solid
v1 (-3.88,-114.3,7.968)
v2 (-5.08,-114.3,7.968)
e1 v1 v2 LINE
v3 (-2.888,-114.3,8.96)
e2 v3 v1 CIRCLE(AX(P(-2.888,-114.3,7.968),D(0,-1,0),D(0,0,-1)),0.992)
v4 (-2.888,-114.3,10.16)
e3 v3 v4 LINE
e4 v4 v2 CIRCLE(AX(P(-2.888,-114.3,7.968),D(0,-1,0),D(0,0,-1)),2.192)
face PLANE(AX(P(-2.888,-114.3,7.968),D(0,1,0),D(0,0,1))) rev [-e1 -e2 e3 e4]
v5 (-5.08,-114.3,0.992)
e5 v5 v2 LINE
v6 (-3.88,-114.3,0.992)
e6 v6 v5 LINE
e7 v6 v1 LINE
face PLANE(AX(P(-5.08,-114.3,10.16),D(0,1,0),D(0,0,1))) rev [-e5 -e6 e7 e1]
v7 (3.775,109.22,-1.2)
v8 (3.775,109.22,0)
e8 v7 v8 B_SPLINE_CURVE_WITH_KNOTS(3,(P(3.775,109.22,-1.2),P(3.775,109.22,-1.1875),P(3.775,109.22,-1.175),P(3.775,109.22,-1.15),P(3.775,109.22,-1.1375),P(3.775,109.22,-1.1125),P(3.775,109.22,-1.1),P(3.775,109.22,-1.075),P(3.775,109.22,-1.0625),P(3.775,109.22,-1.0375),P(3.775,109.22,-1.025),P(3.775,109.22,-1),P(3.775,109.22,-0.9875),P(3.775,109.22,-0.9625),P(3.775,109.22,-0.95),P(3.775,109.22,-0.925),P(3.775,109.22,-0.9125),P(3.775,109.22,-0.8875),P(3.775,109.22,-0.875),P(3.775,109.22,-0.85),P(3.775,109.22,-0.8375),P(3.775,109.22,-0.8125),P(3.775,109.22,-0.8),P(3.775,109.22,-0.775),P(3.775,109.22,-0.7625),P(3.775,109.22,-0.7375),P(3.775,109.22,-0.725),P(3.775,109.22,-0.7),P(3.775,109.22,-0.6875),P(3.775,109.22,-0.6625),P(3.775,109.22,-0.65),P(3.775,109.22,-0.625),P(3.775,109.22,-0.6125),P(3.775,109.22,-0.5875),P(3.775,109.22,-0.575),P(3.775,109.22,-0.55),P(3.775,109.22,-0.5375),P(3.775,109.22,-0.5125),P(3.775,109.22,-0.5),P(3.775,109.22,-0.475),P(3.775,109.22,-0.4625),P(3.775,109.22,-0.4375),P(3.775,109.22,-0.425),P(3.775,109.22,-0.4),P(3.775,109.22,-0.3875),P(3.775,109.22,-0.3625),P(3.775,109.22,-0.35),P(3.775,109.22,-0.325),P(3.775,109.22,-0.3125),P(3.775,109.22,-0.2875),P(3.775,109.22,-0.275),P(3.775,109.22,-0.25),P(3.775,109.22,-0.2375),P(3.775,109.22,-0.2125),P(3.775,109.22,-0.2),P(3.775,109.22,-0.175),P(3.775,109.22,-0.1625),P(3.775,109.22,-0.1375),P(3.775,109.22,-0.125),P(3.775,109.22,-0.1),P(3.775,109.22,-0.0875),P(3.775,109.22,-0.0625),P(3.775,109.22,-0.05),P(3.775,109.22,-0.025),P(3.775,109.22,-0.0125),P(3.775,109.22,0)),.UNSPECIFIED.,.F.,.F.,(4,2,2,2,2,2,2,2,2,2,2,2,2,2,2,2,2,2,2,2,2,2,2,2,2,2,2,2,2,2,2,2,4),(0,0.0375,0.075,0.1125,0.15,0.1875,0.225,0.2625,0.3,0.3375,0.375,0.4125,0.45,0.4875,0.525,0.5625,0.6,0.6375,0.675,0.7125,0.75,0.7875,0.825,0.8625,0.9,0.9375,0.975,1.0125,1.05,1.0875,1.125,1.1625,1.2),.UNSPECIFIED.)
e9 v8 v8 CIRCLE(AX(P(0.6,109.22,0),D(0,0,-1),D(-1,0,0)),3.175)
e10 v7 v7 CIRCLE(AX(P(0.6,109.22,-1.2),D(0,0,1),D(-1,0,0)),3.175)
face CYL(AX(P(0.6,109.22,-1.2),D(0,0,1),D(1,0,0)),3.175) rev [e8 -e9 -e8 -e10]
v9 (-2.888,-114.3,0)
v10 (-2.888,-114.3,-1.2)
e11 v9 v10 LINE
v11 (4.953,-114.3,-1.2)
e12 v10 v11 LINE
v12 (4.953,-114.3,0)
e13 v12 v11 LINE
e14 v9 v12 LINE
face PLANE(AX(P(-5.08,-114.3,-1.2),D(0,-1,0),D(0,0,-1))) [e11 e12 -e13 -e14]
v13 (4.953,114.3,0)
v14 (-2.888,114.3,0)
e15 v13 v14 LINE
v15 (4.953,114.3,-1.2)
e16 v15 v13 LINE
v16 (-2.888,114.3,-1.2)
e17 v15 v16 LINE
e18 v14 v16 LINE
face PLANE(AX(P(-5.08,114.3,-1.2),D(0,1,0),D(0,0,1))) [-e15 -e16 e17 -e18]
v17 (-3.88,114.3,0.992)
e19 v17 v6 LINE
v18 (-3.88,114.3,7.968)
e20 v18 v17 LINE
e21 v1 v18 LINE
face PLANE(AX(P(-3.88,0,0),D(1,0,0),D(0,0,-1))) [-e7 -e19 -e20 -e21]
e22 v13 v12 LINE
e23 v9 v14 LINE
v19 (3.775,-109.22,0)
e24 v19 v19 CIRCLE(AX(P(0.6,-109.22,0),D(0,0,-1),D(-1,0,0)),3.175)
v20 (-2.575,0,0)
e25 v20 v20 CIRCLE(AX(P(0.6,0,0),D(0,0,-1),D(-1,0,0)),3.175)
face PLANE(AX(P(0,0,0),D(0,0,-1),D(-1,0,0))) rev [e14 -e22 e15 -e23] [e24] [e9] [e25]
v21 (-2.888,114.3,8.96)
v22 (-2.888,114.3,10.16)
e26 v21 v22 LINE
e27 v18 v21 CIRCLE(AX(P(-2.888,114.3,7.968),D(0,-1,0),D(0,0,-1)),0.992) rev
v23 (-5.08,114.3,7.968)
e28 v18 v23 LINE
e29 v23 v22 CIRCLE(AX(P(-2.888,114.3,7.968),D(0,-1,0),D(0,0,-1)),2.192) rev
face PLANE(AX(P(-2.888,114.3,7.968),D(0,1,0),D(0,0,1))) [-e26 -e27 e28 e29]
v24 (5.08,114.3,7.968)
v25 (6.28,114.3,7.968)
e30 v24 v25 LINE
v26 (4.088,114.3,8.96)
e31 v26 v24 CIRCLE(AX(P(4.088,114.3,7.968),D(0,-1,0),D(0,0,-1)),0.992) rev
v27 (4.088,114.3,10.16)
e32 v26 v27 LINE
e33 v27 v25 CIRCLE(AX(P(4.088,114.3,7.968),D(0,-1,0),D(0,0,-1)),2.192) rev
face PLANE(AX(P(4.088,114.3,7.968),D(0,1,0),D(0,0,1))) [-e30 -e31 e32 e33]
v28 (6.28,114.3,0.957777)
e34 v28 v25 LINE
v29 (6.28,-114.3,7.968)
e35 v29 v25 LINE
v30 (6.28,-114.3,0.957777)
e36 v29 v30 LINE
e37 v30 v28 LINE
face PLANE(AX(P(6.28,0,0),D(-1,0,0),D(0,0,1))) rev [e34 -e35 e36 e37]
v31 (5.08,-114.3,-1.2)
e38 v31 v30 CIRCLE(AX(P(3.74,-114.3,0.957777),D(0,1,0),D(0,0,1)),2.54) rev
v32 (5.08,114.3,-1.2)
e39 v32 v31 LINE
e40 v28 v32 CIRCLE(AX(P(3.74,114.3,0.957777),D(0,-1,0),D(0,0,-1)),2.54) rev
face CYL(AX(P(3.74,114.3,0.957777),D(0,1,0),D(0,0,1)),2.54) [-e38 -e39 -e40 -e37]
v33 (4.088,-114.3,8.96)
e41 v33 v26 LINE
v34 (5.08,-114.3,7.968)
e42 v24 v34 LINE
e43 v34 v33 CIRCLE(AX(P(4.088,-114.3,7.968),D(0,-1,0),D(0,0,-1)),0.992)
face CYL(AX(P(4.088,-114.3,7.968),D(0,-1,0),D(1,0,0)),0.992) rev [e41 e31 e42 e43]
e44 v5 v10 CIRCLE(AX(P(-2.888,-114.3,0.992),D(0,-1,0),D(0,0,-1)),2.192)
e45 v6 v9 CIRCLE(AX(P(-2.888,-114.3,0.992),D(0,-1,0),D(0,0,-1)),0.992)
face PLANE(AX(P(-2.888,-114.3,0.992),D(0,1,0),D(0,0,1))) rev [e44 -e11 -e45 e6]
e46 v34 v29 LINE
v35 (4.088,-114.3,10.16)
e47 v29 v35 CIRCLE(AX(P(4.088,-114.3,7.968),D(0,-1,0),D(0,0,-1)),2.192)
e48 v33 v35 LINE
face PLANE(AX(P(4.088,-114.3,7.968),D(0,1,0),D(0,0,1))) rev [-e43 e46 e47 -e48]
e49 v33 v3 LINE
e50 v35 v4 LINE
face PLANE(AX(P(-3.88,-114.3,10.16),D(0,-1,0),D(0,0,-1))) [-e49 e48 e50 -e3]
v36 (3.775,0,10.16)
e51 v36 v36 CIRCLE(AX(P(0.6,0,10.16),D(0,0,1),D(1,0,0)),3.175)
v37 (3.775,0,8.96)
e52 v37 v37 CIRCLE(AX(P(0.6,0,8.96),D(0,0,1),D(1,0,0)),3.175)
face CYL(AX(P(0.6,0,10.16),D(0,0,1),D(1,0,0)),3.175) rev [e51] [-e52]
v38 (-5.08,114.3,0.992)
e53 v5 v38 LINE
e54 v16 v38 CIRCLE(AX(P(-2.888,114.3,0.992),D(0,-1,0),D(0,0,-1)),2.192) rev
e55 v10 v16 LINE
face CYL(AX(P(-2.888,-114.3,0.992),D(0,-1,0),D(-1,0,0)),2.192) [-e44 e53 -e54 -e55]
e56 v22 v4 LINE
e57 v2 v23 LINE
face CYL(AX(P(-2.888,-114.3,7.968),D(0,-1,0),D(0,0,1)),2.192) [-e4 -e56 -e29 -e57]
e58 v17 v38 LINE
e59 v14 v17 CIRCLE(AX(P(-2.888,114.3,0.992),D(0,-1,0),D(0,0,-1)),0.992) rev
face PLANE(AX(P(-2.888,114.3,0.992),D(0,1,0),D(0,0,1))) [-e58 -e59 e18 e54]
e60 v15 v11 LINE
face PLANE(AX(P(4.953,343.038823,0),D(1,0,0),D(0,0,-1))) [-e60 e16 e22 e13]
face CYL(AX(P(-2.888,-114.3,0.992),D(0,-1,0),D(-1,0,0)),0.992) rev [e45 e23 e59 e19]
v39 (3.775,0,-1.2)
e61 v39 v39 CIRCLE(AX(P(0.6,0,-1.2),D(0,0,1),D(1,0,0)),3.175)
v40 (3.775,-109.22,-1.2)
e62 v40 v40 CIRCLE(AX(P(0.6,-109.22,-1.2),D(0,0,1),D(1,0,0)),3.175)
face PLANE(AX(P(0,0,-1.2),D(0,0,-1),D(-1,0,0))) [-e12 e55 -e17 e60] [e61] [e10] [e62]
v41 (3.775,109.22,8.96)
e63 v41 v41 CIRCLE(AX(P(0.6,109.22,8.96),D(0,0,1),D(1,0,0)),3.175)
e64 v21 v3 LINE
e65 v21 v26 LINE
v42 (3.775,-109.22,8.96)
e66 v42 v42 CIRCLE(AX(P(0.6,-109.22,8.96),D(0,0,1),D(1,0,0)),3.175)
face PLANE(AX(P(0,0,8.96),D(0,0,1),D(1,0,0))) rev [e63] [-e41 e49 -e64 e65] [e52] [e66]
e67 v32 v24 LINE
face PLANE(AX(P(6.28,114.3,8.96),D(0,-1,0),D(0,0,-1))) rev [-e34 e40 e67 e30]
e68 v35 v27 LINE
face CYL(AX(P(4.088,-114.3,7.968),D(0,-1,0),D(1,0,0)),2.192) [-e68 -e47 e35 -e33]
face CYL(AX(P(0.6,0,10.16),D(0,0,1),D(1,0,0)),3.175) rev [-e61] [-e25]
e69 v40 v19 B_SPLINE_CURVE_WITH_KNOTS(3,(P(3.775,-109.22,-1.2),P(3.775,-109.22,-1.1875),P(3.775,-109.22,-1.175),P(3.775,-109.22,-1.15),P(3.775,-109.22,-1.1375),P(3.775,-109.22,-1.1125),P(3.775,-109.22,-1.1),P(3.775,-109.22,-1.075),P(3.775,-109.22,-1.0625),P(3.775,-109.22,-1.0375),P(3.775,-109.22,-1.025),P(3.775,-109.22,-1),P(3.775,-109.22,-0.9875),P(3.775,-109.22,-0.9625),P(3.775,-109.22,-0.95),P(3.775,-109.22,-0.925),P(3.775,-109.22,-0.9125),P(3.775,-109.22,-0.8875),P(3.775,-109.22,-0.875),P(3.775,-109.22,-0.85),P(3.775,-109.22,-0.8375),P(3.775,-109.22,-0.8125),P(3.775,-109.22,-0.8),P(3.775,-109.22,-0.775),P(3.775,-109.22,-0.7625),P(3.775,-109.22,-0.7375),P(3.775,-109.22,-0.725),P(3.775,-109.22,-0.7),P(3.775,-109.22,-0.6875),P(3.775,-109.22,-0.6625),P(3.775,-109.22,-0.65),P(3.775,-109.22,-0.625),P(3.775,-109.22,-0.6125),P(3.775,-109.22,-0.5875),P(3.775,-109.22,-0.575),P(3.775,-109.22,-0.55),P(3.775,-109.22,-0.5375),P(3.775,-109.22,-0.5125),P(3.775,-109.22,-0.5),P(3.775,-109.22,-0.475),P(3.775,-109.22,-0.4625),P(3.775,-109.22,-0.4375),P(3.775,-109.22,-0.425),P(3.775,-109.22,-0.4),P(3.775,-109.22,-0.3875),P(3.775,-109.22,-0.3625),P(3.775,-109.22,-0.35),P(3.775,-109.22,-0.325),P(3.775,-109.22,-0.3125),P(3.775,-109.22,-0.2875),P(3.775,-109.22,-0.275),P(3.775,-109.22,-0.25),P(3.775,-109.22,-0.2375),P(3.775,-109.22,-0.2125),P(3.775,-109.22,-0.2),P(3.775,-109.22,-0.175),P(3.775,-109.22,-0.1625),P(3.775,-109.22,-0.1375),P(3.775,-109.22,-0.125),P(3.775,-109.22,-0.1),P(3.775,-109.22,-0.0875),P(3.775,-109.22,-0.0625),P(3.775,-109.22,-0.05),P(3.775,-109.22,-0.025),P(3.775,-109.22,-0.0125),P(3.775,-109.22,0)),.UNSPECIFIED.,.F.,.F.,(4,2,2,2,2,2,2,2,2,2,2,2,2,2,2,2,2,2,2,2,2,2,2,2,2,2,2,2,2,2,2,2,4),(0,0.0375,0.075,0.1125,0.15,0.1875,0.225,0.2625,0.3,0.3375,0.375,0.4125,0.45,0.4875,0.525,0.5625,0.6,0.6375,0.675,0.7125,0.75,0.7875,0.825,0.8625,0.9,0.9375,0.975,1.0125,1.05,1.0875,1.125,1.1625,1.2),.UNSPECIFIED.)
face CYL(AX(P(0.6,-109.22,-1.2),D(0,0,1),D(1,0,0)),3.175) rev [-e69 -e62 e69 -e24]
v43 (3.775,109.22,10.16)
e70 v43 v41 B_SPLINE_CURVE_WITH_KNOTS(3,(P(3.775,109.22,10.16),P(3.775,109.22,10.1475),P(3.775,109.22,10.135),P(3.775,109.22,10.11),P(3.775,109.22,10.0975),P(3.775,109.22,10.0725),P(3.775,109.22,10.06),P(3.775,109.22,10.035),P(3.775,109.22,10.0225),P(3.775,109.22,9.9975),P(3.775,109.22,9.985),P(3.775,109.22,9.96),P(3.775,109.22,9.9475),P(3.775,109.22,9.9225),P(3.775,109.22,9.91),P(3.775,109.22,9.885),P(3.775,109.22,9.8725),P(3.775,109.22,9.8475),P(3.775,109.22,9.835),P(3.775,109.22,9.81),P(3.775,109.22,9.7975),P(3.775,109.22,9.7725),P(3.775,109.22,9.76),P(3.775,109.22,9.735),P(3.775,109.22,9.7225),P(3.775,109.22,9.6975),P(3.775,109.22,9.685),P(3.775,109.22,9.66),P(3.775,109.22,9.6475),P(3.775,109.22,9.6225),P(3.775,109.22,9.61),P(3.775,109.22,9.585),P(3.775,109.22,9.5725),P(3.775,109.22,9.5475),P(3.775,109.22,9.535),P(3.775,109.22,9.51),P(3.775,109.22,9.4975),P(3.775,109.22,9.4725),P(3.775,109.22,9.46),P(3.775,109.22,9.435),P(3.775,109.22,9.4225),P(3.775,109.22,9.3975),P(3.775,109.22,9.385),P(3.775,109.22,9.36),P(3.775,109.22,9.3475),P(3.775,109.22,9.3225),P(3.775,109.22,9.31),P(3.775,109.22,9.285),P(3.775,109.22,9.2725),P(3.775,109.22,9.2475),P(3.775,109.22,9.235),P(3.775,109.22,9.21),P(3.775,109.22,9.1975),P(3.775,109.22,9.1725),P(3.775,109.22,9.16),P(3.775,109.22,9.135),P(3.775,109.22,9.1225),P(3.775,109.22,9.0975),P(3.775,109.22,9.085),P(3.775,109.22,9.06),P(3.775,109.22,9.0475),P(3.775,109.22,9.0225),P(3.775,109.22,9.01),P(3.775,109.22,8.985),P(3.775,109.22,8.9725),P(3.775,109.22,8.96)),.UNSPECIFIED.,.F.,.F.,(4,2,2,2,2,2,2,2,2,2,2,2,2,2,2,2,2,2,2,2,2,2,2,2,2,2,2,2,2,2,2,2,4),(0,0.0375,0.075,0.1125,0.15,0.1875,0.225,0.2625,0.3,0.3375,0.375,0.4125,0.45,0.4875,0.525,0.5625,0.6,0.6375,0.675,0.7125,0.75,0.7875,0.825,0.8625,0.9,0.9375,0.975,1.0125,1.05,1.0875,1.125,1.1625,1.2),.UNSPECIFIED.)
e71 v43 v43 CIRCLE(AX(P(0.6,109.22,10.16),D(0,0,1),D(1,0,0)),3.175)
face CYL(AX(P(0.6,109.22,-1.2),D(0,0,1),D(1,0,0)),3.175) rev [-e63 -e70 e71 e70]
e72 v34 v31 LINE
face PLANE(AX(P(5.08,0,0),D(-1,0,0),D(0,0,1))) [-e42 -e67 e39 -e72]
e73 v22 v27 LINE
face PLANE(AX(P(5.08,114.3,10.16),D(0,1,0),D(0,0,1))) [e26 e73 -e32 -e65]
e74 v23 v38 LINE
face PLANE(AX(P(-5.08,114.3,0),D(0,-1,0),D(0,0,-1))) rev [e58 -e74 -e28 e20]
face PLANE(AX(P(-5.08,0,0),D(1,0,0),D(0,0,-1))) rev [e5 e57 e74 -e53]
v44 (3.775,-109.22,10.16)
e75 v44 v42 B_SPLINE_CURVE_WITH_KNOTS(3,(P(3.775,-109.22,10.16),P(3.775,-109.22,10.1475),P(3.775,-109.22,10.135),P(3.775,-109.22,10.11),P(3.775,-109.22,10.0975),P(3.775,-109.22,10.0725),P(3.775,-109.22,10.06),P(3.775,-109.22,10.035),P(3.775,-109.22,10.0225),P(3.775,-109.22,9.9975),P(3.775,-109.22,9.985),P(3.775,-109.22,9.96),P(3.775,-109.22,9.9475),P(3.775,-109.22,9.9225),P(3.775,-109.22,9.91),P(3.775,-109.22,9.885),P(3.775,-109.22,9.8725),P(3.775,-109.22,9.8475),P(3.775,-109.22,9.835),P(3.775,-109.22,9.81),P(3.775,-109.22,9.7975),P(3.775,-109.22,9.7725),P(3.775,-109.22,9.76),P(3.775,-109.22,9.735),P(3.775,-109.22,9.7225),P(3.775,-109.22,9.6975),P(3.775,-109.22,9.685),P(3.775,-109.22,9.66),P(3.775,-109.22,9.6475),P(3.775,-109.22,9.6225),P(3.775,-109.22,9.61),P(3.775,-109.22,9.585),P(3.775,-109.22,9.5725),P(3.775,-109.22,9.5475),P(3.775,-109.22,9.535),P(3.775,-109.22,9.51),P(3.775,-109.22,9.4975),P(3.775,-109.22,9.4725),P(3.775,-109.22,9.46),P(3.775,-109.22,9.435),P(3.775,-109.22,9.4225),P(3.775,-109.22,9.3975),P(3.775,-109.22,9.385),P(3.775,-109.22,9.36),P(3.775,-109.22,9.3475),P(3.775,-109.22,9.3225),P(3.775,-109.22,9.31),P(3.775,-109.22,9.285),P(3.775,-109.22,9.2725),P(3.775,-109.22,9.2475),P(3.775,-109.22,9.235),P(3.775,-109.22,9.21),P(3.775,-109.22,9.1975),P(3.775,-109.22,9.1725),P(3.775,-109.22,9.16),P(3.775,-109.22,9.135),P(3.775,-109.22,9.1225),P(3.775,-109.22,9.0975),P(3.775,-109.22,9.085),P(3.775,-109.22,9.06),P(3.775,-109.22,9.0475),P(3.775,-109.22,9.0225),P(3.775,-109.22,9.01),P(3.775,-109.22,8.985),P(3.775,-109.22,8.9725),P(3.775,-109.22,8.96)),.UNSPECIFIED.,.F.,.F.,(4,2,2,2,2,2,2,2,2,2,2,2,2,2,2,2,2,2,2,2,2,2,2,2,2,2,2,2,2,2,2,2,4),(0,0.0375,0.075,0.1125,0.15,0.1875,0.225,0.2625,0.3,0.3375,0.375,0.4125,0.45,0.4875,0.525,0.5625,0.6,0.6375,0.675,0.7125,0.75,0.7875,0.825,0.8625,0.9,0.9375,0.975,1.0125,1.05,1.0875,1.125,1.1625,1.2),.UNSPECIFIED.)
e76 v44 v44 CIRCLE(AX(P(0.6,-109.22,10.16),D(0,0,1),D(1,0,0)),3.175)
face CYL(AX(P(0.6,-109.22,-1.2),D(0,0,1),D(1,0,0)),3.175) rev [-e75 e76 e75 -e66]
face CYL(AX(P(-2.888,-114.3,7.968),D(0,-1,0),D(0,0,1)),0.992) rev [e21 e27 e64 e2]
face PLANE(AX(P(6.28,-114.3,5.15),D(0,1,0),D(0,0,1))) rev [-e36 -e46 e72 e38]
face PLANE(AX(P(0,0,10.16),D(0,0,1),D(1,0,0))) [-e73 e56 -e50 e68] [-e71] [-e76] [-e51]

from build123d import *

# Parameters (mm, degrees)
SKETCH12_W                   = 10.16
SKETCH12_H                   = 228.6
BASE_FLANGE1_DEPTH           = 1.2
EDGE_FLANGE1_STRIP_W         = 6.784000096
EDGE_FLANGE1_STRIP_H         = 1.2
EDGE_FLANGE1_STRIP_CUT_DEPTH = 228.6
EDGE_FLANGE1_DEPTH           = 228.6
EDGE_FLANGE2_STRIP_W         = 6.784000096
EDGE_FLANGE2_STRIP_H         = 1.2
EDGE_FLANGE2_STRIP_CUT_DEPTH = 228.6
EDGE_FLANGE2_DEPTH           = 228.6
EDGE_FLANGE3_STRIP_W         = 6.784000096
EDGE_FLANGE3_STRIP_H         = 1.2
EDGE_FLANGE3_STRIP_CUT_DEPTH = 228.6
EDGE_FLANGE3_DEPTH           = 228.6
F_1_4_0_25_DIAMETER_HOLE1_D  = 6.35
CUT_EXTRUDE1_DEPTH           = 116.034681727
CUT_EXTRUDE1_DEPTH_BACK      = 116.034681727
SKETCH30_R                   = 3.175
CLOSED_START                 = -114.3
CLOSED_CORNER1_OUTLINE_W     = 0.127
CLOSED_CORNER1_OUTLINE_H     = 1.2
CLOSED_CORNER1_DEPTH         = 228.6
CLOSED_CORNER1_2_OUTLINE_W   = 1.2
CLOSED_CORNER1_2_OUTLINE_H   = 6.35
CLOSED_CORNER1_2_DEPTH       = 228.6
FILLET1_R                    = 2.54


# Read off the part's stored shape, not the designer's step: Closed Corner1
# Sheet-metal steps are written as plain solids
with BuildPart() as part:
    # Sketch12 → Base-Flange1 (new body)
    with BuildSketch(Plane.XY):
        Rectangle(SKETCH12_W, SKETCH12_H)
    extrude(amount=-BASE_FLANGE1_DEPTH)

    # Edge-Flange1 strip (across the edge) → Edge-Flange1 strip cut (cut)
    with BuildSketch(Plane(origin=(-5.08, 114.3, 0), x_dir=(1, 0, 0), z_dir=(0, -1, 0))):
        with Locations((-1.2, -0.6)):
            Rectangle(EDGE_FLANGE1_STRIP_W, EDGE_FLANGE1_STRIP_H)
    extrude(amount=EDGE_FLANGE1_STRIP_CUT_DEPTH, mode=Mode.SUBTRACT)

    # Edge-Flange1 section (across the edge) → Edge-Flange1 (add)
    with BuildSketch(Plane(origin=(-5.08, 114.3, 0), x_dir=(1, 0, 0), z_dir=(0, -1, 0))):
        with BuildLine():
            Line((0, 0.992000048), (0, 10.16))
            Line((0, 10.16), (1.2, 10.16))
            Line((1.2, 10.16), (1.2, 0.992000048))
            ThreePointArc((1.2, 0.992000048), (1.490550087, 0.290550087), (2.192000048, 0))
            Line((2.192000048, 0), (2.192000048, -1.2))
            ThreePointArc((2.192000048, -1.2), (0.64202195, -0.55797805), (0, 0.992000048))
        make_face()
    extrude(amount=EDGE_FLANGE1_DEPTH)

    # Edge-Flange2 strip (across the edge) → Edge-Flange2 strip cut (cut)
    with BuildSketch(Plane(origin=(-3.88, 114.3, 10.16), x_dir=(0, 0, -1), z_dir=(0, -1, 0))):
        with Locations((-1.2, -0.6)):
            Rectangle(EDGE_FLANGE2_STRIP_W, EDGE_FLANGE2_STRIP_H)
    extrude(amount=EDGE_FLANGE2_STRIP_CUT_DEPTH, mode=Mode.SUBTRACT)

    # Edge-Flange2 section (across the edge) → Edge-Flange2 (add)
    with BuildSketch(Plane(origin=(-3.88, 114.3, 10.16), x_dir=(0, 0, -1), z_dir=(0, -1, 0))):
        with BuildLine():
            Line((0, 0.992000048), (0, 8.96))
            Line((0, 8.96), (1.2, 8.96))
            Line((1.2, 8.96), (1.2, 0.992000048))
            ThreePointArc((1.2, 0.992000048), (1.490550087, 0.290550087), (2.192000048, 0))
            Line((2.192000048, 0), (2.192000048, -1.2))
            ThreePointArc((2.192000048, -1.2), (0.64202195, -0.55797805), (0, 0.992000048))
        make_face()
    extrude(amount=EDGE_FLANGE2_DEPTH)

    # Edge-Flange3 strip (across the edge) → Edge-Flange3 strip cut (cut)
    with BuildSketch(Plane(origin=(5.08, 114.3, 8.96), x_dir=(-1, 0, 0), z_dir=(0, -1, 0))):
        with Locations((-2.4, -0.6)):
            Rectangle(EDGE_FLANGE3_STRIP_W, EDGE_FLANGE3_STRIP_H)
    extrude(amount=EDGE_FLANGE3_STRIP_CUT_DEPTH, mode=Mode.SUBTRACT)

    # Edge-Flange3 section (across the edge) → Edge-Flange3 (add)
    with BuildSketch(Plane(origin=(5.08, 114.3, 8.96), x_dir=(-1, 0, 0), z_dir=(0, -1, 0))):
        with BuildLine():
            Line((-1.2, 0.992000048), (-1.2, 3.81))
            Line((-1.2, 3.81), (0, 3.81))
            Line((0, 3.81), (0, 0.992000048))
            ThreePointArc((0, 0.992000048), (0.290550087, 0.290550087), (0.992000048, 0))
            Line((0.992000048, 0), (0.992000048, -1.2))
            ThreePointArc((0.992000048, -1.2), (-0.55797805, -0.55797805), (-1.2, 0.992000048))
        make_face()
    extrude(amount=EDGE_FLANGE3_DEPTH)

    # 1/4 (0.25) Diameter Hole1 (through all)
    with Locations(Plane.XY.offset(10.16)):
        with Locations((0.6, 0)):
            Hole(F_1_4_0_25_DIAMETER_HOLE1_D / 2)

    # Sketch30 → Cut-Extrude1 (cut, two sides: drawn at the far end of the back side and taken through both)
    with BuildSketch(Plane.XY.offset(10.16).offset(-CUT_EXTRUDE1_DEPTH_BACK)):
        with Locations((0.6, -109.22)):
            Circle(SKETCH30_R)
        with Locations((0.6, 109.22)):
            Circle(SKETCH30_R)
    extrude(amount=CUT_EXTRUDE1_DEPTH + CUT_EXTRUDE1_DEPTH_BACK, mode=Mode.SUBTRACT)

    # Closed Corner1 outline → Closed Corner1 (cut)
    with BuildSketch(Plane(origin=(0, 0, 0), x_dir=(1, 0, 0), z_dir=(0, 1, 0)).offset(CLOSED_START)):
        with Locations((5.0165, 0.6)):
            Rectangle(CLOSED_CORNER1_OUTLINE_W, CLOSED_CORNER1_OUTLINE_H)
    extrude(amount=CLOSED_CORNER1_DEPTH, mode=Mode.SUBTRACT)

    # Closed Corner1 2 outline → Closed Corner1 2 (add)
    with BuildSketch(Plane(origin=(0, 0, 0), x_dir=(1, 0, 0), z_dir=(0, 1, 0)).offset(CLOSED_START)):
        with Locations((5.68, -1.975)):
            Rectangle(CLOSED_CORNER1_2_OUTLINE_W, CLOSED_CORNER1_2_OUTLINE_H)
    extrude(amount=CLOSED_CORNER1_2_DEPTH)

    # Fillet1
    # the kernel refuses this fillet: 2.54 mm, written as the material it takes off along each edge
    with BuildSketch(Plane(origin=(6.28, -119.694441584, -1.2), x_dir=(0, 0, 1), z_dir=(0, 1, 0))) as fillet1_piece_1:
        with BuildLine():
            CenterArc((2.157776633, -2.54), FILLET1_R, 90, 58.159322109)
            Line((0, -1.2), (-0.043155533, -1.1732))
            ThreePointArc((-0.043155533, -1.1732), (-0.0508, -0.6), (-0.0508, 0))
            Line((-0.0508, 0), (0, 0.0508))
            Line((0, 0.0508), (2.157776633, 0.0508))
            Line((2.157776633, 0.0508), (2.157776633, 0))
        make_face()
    extrude(amount=239.388883167, mode=Mode.SUBTRACT)


solid = part.part
